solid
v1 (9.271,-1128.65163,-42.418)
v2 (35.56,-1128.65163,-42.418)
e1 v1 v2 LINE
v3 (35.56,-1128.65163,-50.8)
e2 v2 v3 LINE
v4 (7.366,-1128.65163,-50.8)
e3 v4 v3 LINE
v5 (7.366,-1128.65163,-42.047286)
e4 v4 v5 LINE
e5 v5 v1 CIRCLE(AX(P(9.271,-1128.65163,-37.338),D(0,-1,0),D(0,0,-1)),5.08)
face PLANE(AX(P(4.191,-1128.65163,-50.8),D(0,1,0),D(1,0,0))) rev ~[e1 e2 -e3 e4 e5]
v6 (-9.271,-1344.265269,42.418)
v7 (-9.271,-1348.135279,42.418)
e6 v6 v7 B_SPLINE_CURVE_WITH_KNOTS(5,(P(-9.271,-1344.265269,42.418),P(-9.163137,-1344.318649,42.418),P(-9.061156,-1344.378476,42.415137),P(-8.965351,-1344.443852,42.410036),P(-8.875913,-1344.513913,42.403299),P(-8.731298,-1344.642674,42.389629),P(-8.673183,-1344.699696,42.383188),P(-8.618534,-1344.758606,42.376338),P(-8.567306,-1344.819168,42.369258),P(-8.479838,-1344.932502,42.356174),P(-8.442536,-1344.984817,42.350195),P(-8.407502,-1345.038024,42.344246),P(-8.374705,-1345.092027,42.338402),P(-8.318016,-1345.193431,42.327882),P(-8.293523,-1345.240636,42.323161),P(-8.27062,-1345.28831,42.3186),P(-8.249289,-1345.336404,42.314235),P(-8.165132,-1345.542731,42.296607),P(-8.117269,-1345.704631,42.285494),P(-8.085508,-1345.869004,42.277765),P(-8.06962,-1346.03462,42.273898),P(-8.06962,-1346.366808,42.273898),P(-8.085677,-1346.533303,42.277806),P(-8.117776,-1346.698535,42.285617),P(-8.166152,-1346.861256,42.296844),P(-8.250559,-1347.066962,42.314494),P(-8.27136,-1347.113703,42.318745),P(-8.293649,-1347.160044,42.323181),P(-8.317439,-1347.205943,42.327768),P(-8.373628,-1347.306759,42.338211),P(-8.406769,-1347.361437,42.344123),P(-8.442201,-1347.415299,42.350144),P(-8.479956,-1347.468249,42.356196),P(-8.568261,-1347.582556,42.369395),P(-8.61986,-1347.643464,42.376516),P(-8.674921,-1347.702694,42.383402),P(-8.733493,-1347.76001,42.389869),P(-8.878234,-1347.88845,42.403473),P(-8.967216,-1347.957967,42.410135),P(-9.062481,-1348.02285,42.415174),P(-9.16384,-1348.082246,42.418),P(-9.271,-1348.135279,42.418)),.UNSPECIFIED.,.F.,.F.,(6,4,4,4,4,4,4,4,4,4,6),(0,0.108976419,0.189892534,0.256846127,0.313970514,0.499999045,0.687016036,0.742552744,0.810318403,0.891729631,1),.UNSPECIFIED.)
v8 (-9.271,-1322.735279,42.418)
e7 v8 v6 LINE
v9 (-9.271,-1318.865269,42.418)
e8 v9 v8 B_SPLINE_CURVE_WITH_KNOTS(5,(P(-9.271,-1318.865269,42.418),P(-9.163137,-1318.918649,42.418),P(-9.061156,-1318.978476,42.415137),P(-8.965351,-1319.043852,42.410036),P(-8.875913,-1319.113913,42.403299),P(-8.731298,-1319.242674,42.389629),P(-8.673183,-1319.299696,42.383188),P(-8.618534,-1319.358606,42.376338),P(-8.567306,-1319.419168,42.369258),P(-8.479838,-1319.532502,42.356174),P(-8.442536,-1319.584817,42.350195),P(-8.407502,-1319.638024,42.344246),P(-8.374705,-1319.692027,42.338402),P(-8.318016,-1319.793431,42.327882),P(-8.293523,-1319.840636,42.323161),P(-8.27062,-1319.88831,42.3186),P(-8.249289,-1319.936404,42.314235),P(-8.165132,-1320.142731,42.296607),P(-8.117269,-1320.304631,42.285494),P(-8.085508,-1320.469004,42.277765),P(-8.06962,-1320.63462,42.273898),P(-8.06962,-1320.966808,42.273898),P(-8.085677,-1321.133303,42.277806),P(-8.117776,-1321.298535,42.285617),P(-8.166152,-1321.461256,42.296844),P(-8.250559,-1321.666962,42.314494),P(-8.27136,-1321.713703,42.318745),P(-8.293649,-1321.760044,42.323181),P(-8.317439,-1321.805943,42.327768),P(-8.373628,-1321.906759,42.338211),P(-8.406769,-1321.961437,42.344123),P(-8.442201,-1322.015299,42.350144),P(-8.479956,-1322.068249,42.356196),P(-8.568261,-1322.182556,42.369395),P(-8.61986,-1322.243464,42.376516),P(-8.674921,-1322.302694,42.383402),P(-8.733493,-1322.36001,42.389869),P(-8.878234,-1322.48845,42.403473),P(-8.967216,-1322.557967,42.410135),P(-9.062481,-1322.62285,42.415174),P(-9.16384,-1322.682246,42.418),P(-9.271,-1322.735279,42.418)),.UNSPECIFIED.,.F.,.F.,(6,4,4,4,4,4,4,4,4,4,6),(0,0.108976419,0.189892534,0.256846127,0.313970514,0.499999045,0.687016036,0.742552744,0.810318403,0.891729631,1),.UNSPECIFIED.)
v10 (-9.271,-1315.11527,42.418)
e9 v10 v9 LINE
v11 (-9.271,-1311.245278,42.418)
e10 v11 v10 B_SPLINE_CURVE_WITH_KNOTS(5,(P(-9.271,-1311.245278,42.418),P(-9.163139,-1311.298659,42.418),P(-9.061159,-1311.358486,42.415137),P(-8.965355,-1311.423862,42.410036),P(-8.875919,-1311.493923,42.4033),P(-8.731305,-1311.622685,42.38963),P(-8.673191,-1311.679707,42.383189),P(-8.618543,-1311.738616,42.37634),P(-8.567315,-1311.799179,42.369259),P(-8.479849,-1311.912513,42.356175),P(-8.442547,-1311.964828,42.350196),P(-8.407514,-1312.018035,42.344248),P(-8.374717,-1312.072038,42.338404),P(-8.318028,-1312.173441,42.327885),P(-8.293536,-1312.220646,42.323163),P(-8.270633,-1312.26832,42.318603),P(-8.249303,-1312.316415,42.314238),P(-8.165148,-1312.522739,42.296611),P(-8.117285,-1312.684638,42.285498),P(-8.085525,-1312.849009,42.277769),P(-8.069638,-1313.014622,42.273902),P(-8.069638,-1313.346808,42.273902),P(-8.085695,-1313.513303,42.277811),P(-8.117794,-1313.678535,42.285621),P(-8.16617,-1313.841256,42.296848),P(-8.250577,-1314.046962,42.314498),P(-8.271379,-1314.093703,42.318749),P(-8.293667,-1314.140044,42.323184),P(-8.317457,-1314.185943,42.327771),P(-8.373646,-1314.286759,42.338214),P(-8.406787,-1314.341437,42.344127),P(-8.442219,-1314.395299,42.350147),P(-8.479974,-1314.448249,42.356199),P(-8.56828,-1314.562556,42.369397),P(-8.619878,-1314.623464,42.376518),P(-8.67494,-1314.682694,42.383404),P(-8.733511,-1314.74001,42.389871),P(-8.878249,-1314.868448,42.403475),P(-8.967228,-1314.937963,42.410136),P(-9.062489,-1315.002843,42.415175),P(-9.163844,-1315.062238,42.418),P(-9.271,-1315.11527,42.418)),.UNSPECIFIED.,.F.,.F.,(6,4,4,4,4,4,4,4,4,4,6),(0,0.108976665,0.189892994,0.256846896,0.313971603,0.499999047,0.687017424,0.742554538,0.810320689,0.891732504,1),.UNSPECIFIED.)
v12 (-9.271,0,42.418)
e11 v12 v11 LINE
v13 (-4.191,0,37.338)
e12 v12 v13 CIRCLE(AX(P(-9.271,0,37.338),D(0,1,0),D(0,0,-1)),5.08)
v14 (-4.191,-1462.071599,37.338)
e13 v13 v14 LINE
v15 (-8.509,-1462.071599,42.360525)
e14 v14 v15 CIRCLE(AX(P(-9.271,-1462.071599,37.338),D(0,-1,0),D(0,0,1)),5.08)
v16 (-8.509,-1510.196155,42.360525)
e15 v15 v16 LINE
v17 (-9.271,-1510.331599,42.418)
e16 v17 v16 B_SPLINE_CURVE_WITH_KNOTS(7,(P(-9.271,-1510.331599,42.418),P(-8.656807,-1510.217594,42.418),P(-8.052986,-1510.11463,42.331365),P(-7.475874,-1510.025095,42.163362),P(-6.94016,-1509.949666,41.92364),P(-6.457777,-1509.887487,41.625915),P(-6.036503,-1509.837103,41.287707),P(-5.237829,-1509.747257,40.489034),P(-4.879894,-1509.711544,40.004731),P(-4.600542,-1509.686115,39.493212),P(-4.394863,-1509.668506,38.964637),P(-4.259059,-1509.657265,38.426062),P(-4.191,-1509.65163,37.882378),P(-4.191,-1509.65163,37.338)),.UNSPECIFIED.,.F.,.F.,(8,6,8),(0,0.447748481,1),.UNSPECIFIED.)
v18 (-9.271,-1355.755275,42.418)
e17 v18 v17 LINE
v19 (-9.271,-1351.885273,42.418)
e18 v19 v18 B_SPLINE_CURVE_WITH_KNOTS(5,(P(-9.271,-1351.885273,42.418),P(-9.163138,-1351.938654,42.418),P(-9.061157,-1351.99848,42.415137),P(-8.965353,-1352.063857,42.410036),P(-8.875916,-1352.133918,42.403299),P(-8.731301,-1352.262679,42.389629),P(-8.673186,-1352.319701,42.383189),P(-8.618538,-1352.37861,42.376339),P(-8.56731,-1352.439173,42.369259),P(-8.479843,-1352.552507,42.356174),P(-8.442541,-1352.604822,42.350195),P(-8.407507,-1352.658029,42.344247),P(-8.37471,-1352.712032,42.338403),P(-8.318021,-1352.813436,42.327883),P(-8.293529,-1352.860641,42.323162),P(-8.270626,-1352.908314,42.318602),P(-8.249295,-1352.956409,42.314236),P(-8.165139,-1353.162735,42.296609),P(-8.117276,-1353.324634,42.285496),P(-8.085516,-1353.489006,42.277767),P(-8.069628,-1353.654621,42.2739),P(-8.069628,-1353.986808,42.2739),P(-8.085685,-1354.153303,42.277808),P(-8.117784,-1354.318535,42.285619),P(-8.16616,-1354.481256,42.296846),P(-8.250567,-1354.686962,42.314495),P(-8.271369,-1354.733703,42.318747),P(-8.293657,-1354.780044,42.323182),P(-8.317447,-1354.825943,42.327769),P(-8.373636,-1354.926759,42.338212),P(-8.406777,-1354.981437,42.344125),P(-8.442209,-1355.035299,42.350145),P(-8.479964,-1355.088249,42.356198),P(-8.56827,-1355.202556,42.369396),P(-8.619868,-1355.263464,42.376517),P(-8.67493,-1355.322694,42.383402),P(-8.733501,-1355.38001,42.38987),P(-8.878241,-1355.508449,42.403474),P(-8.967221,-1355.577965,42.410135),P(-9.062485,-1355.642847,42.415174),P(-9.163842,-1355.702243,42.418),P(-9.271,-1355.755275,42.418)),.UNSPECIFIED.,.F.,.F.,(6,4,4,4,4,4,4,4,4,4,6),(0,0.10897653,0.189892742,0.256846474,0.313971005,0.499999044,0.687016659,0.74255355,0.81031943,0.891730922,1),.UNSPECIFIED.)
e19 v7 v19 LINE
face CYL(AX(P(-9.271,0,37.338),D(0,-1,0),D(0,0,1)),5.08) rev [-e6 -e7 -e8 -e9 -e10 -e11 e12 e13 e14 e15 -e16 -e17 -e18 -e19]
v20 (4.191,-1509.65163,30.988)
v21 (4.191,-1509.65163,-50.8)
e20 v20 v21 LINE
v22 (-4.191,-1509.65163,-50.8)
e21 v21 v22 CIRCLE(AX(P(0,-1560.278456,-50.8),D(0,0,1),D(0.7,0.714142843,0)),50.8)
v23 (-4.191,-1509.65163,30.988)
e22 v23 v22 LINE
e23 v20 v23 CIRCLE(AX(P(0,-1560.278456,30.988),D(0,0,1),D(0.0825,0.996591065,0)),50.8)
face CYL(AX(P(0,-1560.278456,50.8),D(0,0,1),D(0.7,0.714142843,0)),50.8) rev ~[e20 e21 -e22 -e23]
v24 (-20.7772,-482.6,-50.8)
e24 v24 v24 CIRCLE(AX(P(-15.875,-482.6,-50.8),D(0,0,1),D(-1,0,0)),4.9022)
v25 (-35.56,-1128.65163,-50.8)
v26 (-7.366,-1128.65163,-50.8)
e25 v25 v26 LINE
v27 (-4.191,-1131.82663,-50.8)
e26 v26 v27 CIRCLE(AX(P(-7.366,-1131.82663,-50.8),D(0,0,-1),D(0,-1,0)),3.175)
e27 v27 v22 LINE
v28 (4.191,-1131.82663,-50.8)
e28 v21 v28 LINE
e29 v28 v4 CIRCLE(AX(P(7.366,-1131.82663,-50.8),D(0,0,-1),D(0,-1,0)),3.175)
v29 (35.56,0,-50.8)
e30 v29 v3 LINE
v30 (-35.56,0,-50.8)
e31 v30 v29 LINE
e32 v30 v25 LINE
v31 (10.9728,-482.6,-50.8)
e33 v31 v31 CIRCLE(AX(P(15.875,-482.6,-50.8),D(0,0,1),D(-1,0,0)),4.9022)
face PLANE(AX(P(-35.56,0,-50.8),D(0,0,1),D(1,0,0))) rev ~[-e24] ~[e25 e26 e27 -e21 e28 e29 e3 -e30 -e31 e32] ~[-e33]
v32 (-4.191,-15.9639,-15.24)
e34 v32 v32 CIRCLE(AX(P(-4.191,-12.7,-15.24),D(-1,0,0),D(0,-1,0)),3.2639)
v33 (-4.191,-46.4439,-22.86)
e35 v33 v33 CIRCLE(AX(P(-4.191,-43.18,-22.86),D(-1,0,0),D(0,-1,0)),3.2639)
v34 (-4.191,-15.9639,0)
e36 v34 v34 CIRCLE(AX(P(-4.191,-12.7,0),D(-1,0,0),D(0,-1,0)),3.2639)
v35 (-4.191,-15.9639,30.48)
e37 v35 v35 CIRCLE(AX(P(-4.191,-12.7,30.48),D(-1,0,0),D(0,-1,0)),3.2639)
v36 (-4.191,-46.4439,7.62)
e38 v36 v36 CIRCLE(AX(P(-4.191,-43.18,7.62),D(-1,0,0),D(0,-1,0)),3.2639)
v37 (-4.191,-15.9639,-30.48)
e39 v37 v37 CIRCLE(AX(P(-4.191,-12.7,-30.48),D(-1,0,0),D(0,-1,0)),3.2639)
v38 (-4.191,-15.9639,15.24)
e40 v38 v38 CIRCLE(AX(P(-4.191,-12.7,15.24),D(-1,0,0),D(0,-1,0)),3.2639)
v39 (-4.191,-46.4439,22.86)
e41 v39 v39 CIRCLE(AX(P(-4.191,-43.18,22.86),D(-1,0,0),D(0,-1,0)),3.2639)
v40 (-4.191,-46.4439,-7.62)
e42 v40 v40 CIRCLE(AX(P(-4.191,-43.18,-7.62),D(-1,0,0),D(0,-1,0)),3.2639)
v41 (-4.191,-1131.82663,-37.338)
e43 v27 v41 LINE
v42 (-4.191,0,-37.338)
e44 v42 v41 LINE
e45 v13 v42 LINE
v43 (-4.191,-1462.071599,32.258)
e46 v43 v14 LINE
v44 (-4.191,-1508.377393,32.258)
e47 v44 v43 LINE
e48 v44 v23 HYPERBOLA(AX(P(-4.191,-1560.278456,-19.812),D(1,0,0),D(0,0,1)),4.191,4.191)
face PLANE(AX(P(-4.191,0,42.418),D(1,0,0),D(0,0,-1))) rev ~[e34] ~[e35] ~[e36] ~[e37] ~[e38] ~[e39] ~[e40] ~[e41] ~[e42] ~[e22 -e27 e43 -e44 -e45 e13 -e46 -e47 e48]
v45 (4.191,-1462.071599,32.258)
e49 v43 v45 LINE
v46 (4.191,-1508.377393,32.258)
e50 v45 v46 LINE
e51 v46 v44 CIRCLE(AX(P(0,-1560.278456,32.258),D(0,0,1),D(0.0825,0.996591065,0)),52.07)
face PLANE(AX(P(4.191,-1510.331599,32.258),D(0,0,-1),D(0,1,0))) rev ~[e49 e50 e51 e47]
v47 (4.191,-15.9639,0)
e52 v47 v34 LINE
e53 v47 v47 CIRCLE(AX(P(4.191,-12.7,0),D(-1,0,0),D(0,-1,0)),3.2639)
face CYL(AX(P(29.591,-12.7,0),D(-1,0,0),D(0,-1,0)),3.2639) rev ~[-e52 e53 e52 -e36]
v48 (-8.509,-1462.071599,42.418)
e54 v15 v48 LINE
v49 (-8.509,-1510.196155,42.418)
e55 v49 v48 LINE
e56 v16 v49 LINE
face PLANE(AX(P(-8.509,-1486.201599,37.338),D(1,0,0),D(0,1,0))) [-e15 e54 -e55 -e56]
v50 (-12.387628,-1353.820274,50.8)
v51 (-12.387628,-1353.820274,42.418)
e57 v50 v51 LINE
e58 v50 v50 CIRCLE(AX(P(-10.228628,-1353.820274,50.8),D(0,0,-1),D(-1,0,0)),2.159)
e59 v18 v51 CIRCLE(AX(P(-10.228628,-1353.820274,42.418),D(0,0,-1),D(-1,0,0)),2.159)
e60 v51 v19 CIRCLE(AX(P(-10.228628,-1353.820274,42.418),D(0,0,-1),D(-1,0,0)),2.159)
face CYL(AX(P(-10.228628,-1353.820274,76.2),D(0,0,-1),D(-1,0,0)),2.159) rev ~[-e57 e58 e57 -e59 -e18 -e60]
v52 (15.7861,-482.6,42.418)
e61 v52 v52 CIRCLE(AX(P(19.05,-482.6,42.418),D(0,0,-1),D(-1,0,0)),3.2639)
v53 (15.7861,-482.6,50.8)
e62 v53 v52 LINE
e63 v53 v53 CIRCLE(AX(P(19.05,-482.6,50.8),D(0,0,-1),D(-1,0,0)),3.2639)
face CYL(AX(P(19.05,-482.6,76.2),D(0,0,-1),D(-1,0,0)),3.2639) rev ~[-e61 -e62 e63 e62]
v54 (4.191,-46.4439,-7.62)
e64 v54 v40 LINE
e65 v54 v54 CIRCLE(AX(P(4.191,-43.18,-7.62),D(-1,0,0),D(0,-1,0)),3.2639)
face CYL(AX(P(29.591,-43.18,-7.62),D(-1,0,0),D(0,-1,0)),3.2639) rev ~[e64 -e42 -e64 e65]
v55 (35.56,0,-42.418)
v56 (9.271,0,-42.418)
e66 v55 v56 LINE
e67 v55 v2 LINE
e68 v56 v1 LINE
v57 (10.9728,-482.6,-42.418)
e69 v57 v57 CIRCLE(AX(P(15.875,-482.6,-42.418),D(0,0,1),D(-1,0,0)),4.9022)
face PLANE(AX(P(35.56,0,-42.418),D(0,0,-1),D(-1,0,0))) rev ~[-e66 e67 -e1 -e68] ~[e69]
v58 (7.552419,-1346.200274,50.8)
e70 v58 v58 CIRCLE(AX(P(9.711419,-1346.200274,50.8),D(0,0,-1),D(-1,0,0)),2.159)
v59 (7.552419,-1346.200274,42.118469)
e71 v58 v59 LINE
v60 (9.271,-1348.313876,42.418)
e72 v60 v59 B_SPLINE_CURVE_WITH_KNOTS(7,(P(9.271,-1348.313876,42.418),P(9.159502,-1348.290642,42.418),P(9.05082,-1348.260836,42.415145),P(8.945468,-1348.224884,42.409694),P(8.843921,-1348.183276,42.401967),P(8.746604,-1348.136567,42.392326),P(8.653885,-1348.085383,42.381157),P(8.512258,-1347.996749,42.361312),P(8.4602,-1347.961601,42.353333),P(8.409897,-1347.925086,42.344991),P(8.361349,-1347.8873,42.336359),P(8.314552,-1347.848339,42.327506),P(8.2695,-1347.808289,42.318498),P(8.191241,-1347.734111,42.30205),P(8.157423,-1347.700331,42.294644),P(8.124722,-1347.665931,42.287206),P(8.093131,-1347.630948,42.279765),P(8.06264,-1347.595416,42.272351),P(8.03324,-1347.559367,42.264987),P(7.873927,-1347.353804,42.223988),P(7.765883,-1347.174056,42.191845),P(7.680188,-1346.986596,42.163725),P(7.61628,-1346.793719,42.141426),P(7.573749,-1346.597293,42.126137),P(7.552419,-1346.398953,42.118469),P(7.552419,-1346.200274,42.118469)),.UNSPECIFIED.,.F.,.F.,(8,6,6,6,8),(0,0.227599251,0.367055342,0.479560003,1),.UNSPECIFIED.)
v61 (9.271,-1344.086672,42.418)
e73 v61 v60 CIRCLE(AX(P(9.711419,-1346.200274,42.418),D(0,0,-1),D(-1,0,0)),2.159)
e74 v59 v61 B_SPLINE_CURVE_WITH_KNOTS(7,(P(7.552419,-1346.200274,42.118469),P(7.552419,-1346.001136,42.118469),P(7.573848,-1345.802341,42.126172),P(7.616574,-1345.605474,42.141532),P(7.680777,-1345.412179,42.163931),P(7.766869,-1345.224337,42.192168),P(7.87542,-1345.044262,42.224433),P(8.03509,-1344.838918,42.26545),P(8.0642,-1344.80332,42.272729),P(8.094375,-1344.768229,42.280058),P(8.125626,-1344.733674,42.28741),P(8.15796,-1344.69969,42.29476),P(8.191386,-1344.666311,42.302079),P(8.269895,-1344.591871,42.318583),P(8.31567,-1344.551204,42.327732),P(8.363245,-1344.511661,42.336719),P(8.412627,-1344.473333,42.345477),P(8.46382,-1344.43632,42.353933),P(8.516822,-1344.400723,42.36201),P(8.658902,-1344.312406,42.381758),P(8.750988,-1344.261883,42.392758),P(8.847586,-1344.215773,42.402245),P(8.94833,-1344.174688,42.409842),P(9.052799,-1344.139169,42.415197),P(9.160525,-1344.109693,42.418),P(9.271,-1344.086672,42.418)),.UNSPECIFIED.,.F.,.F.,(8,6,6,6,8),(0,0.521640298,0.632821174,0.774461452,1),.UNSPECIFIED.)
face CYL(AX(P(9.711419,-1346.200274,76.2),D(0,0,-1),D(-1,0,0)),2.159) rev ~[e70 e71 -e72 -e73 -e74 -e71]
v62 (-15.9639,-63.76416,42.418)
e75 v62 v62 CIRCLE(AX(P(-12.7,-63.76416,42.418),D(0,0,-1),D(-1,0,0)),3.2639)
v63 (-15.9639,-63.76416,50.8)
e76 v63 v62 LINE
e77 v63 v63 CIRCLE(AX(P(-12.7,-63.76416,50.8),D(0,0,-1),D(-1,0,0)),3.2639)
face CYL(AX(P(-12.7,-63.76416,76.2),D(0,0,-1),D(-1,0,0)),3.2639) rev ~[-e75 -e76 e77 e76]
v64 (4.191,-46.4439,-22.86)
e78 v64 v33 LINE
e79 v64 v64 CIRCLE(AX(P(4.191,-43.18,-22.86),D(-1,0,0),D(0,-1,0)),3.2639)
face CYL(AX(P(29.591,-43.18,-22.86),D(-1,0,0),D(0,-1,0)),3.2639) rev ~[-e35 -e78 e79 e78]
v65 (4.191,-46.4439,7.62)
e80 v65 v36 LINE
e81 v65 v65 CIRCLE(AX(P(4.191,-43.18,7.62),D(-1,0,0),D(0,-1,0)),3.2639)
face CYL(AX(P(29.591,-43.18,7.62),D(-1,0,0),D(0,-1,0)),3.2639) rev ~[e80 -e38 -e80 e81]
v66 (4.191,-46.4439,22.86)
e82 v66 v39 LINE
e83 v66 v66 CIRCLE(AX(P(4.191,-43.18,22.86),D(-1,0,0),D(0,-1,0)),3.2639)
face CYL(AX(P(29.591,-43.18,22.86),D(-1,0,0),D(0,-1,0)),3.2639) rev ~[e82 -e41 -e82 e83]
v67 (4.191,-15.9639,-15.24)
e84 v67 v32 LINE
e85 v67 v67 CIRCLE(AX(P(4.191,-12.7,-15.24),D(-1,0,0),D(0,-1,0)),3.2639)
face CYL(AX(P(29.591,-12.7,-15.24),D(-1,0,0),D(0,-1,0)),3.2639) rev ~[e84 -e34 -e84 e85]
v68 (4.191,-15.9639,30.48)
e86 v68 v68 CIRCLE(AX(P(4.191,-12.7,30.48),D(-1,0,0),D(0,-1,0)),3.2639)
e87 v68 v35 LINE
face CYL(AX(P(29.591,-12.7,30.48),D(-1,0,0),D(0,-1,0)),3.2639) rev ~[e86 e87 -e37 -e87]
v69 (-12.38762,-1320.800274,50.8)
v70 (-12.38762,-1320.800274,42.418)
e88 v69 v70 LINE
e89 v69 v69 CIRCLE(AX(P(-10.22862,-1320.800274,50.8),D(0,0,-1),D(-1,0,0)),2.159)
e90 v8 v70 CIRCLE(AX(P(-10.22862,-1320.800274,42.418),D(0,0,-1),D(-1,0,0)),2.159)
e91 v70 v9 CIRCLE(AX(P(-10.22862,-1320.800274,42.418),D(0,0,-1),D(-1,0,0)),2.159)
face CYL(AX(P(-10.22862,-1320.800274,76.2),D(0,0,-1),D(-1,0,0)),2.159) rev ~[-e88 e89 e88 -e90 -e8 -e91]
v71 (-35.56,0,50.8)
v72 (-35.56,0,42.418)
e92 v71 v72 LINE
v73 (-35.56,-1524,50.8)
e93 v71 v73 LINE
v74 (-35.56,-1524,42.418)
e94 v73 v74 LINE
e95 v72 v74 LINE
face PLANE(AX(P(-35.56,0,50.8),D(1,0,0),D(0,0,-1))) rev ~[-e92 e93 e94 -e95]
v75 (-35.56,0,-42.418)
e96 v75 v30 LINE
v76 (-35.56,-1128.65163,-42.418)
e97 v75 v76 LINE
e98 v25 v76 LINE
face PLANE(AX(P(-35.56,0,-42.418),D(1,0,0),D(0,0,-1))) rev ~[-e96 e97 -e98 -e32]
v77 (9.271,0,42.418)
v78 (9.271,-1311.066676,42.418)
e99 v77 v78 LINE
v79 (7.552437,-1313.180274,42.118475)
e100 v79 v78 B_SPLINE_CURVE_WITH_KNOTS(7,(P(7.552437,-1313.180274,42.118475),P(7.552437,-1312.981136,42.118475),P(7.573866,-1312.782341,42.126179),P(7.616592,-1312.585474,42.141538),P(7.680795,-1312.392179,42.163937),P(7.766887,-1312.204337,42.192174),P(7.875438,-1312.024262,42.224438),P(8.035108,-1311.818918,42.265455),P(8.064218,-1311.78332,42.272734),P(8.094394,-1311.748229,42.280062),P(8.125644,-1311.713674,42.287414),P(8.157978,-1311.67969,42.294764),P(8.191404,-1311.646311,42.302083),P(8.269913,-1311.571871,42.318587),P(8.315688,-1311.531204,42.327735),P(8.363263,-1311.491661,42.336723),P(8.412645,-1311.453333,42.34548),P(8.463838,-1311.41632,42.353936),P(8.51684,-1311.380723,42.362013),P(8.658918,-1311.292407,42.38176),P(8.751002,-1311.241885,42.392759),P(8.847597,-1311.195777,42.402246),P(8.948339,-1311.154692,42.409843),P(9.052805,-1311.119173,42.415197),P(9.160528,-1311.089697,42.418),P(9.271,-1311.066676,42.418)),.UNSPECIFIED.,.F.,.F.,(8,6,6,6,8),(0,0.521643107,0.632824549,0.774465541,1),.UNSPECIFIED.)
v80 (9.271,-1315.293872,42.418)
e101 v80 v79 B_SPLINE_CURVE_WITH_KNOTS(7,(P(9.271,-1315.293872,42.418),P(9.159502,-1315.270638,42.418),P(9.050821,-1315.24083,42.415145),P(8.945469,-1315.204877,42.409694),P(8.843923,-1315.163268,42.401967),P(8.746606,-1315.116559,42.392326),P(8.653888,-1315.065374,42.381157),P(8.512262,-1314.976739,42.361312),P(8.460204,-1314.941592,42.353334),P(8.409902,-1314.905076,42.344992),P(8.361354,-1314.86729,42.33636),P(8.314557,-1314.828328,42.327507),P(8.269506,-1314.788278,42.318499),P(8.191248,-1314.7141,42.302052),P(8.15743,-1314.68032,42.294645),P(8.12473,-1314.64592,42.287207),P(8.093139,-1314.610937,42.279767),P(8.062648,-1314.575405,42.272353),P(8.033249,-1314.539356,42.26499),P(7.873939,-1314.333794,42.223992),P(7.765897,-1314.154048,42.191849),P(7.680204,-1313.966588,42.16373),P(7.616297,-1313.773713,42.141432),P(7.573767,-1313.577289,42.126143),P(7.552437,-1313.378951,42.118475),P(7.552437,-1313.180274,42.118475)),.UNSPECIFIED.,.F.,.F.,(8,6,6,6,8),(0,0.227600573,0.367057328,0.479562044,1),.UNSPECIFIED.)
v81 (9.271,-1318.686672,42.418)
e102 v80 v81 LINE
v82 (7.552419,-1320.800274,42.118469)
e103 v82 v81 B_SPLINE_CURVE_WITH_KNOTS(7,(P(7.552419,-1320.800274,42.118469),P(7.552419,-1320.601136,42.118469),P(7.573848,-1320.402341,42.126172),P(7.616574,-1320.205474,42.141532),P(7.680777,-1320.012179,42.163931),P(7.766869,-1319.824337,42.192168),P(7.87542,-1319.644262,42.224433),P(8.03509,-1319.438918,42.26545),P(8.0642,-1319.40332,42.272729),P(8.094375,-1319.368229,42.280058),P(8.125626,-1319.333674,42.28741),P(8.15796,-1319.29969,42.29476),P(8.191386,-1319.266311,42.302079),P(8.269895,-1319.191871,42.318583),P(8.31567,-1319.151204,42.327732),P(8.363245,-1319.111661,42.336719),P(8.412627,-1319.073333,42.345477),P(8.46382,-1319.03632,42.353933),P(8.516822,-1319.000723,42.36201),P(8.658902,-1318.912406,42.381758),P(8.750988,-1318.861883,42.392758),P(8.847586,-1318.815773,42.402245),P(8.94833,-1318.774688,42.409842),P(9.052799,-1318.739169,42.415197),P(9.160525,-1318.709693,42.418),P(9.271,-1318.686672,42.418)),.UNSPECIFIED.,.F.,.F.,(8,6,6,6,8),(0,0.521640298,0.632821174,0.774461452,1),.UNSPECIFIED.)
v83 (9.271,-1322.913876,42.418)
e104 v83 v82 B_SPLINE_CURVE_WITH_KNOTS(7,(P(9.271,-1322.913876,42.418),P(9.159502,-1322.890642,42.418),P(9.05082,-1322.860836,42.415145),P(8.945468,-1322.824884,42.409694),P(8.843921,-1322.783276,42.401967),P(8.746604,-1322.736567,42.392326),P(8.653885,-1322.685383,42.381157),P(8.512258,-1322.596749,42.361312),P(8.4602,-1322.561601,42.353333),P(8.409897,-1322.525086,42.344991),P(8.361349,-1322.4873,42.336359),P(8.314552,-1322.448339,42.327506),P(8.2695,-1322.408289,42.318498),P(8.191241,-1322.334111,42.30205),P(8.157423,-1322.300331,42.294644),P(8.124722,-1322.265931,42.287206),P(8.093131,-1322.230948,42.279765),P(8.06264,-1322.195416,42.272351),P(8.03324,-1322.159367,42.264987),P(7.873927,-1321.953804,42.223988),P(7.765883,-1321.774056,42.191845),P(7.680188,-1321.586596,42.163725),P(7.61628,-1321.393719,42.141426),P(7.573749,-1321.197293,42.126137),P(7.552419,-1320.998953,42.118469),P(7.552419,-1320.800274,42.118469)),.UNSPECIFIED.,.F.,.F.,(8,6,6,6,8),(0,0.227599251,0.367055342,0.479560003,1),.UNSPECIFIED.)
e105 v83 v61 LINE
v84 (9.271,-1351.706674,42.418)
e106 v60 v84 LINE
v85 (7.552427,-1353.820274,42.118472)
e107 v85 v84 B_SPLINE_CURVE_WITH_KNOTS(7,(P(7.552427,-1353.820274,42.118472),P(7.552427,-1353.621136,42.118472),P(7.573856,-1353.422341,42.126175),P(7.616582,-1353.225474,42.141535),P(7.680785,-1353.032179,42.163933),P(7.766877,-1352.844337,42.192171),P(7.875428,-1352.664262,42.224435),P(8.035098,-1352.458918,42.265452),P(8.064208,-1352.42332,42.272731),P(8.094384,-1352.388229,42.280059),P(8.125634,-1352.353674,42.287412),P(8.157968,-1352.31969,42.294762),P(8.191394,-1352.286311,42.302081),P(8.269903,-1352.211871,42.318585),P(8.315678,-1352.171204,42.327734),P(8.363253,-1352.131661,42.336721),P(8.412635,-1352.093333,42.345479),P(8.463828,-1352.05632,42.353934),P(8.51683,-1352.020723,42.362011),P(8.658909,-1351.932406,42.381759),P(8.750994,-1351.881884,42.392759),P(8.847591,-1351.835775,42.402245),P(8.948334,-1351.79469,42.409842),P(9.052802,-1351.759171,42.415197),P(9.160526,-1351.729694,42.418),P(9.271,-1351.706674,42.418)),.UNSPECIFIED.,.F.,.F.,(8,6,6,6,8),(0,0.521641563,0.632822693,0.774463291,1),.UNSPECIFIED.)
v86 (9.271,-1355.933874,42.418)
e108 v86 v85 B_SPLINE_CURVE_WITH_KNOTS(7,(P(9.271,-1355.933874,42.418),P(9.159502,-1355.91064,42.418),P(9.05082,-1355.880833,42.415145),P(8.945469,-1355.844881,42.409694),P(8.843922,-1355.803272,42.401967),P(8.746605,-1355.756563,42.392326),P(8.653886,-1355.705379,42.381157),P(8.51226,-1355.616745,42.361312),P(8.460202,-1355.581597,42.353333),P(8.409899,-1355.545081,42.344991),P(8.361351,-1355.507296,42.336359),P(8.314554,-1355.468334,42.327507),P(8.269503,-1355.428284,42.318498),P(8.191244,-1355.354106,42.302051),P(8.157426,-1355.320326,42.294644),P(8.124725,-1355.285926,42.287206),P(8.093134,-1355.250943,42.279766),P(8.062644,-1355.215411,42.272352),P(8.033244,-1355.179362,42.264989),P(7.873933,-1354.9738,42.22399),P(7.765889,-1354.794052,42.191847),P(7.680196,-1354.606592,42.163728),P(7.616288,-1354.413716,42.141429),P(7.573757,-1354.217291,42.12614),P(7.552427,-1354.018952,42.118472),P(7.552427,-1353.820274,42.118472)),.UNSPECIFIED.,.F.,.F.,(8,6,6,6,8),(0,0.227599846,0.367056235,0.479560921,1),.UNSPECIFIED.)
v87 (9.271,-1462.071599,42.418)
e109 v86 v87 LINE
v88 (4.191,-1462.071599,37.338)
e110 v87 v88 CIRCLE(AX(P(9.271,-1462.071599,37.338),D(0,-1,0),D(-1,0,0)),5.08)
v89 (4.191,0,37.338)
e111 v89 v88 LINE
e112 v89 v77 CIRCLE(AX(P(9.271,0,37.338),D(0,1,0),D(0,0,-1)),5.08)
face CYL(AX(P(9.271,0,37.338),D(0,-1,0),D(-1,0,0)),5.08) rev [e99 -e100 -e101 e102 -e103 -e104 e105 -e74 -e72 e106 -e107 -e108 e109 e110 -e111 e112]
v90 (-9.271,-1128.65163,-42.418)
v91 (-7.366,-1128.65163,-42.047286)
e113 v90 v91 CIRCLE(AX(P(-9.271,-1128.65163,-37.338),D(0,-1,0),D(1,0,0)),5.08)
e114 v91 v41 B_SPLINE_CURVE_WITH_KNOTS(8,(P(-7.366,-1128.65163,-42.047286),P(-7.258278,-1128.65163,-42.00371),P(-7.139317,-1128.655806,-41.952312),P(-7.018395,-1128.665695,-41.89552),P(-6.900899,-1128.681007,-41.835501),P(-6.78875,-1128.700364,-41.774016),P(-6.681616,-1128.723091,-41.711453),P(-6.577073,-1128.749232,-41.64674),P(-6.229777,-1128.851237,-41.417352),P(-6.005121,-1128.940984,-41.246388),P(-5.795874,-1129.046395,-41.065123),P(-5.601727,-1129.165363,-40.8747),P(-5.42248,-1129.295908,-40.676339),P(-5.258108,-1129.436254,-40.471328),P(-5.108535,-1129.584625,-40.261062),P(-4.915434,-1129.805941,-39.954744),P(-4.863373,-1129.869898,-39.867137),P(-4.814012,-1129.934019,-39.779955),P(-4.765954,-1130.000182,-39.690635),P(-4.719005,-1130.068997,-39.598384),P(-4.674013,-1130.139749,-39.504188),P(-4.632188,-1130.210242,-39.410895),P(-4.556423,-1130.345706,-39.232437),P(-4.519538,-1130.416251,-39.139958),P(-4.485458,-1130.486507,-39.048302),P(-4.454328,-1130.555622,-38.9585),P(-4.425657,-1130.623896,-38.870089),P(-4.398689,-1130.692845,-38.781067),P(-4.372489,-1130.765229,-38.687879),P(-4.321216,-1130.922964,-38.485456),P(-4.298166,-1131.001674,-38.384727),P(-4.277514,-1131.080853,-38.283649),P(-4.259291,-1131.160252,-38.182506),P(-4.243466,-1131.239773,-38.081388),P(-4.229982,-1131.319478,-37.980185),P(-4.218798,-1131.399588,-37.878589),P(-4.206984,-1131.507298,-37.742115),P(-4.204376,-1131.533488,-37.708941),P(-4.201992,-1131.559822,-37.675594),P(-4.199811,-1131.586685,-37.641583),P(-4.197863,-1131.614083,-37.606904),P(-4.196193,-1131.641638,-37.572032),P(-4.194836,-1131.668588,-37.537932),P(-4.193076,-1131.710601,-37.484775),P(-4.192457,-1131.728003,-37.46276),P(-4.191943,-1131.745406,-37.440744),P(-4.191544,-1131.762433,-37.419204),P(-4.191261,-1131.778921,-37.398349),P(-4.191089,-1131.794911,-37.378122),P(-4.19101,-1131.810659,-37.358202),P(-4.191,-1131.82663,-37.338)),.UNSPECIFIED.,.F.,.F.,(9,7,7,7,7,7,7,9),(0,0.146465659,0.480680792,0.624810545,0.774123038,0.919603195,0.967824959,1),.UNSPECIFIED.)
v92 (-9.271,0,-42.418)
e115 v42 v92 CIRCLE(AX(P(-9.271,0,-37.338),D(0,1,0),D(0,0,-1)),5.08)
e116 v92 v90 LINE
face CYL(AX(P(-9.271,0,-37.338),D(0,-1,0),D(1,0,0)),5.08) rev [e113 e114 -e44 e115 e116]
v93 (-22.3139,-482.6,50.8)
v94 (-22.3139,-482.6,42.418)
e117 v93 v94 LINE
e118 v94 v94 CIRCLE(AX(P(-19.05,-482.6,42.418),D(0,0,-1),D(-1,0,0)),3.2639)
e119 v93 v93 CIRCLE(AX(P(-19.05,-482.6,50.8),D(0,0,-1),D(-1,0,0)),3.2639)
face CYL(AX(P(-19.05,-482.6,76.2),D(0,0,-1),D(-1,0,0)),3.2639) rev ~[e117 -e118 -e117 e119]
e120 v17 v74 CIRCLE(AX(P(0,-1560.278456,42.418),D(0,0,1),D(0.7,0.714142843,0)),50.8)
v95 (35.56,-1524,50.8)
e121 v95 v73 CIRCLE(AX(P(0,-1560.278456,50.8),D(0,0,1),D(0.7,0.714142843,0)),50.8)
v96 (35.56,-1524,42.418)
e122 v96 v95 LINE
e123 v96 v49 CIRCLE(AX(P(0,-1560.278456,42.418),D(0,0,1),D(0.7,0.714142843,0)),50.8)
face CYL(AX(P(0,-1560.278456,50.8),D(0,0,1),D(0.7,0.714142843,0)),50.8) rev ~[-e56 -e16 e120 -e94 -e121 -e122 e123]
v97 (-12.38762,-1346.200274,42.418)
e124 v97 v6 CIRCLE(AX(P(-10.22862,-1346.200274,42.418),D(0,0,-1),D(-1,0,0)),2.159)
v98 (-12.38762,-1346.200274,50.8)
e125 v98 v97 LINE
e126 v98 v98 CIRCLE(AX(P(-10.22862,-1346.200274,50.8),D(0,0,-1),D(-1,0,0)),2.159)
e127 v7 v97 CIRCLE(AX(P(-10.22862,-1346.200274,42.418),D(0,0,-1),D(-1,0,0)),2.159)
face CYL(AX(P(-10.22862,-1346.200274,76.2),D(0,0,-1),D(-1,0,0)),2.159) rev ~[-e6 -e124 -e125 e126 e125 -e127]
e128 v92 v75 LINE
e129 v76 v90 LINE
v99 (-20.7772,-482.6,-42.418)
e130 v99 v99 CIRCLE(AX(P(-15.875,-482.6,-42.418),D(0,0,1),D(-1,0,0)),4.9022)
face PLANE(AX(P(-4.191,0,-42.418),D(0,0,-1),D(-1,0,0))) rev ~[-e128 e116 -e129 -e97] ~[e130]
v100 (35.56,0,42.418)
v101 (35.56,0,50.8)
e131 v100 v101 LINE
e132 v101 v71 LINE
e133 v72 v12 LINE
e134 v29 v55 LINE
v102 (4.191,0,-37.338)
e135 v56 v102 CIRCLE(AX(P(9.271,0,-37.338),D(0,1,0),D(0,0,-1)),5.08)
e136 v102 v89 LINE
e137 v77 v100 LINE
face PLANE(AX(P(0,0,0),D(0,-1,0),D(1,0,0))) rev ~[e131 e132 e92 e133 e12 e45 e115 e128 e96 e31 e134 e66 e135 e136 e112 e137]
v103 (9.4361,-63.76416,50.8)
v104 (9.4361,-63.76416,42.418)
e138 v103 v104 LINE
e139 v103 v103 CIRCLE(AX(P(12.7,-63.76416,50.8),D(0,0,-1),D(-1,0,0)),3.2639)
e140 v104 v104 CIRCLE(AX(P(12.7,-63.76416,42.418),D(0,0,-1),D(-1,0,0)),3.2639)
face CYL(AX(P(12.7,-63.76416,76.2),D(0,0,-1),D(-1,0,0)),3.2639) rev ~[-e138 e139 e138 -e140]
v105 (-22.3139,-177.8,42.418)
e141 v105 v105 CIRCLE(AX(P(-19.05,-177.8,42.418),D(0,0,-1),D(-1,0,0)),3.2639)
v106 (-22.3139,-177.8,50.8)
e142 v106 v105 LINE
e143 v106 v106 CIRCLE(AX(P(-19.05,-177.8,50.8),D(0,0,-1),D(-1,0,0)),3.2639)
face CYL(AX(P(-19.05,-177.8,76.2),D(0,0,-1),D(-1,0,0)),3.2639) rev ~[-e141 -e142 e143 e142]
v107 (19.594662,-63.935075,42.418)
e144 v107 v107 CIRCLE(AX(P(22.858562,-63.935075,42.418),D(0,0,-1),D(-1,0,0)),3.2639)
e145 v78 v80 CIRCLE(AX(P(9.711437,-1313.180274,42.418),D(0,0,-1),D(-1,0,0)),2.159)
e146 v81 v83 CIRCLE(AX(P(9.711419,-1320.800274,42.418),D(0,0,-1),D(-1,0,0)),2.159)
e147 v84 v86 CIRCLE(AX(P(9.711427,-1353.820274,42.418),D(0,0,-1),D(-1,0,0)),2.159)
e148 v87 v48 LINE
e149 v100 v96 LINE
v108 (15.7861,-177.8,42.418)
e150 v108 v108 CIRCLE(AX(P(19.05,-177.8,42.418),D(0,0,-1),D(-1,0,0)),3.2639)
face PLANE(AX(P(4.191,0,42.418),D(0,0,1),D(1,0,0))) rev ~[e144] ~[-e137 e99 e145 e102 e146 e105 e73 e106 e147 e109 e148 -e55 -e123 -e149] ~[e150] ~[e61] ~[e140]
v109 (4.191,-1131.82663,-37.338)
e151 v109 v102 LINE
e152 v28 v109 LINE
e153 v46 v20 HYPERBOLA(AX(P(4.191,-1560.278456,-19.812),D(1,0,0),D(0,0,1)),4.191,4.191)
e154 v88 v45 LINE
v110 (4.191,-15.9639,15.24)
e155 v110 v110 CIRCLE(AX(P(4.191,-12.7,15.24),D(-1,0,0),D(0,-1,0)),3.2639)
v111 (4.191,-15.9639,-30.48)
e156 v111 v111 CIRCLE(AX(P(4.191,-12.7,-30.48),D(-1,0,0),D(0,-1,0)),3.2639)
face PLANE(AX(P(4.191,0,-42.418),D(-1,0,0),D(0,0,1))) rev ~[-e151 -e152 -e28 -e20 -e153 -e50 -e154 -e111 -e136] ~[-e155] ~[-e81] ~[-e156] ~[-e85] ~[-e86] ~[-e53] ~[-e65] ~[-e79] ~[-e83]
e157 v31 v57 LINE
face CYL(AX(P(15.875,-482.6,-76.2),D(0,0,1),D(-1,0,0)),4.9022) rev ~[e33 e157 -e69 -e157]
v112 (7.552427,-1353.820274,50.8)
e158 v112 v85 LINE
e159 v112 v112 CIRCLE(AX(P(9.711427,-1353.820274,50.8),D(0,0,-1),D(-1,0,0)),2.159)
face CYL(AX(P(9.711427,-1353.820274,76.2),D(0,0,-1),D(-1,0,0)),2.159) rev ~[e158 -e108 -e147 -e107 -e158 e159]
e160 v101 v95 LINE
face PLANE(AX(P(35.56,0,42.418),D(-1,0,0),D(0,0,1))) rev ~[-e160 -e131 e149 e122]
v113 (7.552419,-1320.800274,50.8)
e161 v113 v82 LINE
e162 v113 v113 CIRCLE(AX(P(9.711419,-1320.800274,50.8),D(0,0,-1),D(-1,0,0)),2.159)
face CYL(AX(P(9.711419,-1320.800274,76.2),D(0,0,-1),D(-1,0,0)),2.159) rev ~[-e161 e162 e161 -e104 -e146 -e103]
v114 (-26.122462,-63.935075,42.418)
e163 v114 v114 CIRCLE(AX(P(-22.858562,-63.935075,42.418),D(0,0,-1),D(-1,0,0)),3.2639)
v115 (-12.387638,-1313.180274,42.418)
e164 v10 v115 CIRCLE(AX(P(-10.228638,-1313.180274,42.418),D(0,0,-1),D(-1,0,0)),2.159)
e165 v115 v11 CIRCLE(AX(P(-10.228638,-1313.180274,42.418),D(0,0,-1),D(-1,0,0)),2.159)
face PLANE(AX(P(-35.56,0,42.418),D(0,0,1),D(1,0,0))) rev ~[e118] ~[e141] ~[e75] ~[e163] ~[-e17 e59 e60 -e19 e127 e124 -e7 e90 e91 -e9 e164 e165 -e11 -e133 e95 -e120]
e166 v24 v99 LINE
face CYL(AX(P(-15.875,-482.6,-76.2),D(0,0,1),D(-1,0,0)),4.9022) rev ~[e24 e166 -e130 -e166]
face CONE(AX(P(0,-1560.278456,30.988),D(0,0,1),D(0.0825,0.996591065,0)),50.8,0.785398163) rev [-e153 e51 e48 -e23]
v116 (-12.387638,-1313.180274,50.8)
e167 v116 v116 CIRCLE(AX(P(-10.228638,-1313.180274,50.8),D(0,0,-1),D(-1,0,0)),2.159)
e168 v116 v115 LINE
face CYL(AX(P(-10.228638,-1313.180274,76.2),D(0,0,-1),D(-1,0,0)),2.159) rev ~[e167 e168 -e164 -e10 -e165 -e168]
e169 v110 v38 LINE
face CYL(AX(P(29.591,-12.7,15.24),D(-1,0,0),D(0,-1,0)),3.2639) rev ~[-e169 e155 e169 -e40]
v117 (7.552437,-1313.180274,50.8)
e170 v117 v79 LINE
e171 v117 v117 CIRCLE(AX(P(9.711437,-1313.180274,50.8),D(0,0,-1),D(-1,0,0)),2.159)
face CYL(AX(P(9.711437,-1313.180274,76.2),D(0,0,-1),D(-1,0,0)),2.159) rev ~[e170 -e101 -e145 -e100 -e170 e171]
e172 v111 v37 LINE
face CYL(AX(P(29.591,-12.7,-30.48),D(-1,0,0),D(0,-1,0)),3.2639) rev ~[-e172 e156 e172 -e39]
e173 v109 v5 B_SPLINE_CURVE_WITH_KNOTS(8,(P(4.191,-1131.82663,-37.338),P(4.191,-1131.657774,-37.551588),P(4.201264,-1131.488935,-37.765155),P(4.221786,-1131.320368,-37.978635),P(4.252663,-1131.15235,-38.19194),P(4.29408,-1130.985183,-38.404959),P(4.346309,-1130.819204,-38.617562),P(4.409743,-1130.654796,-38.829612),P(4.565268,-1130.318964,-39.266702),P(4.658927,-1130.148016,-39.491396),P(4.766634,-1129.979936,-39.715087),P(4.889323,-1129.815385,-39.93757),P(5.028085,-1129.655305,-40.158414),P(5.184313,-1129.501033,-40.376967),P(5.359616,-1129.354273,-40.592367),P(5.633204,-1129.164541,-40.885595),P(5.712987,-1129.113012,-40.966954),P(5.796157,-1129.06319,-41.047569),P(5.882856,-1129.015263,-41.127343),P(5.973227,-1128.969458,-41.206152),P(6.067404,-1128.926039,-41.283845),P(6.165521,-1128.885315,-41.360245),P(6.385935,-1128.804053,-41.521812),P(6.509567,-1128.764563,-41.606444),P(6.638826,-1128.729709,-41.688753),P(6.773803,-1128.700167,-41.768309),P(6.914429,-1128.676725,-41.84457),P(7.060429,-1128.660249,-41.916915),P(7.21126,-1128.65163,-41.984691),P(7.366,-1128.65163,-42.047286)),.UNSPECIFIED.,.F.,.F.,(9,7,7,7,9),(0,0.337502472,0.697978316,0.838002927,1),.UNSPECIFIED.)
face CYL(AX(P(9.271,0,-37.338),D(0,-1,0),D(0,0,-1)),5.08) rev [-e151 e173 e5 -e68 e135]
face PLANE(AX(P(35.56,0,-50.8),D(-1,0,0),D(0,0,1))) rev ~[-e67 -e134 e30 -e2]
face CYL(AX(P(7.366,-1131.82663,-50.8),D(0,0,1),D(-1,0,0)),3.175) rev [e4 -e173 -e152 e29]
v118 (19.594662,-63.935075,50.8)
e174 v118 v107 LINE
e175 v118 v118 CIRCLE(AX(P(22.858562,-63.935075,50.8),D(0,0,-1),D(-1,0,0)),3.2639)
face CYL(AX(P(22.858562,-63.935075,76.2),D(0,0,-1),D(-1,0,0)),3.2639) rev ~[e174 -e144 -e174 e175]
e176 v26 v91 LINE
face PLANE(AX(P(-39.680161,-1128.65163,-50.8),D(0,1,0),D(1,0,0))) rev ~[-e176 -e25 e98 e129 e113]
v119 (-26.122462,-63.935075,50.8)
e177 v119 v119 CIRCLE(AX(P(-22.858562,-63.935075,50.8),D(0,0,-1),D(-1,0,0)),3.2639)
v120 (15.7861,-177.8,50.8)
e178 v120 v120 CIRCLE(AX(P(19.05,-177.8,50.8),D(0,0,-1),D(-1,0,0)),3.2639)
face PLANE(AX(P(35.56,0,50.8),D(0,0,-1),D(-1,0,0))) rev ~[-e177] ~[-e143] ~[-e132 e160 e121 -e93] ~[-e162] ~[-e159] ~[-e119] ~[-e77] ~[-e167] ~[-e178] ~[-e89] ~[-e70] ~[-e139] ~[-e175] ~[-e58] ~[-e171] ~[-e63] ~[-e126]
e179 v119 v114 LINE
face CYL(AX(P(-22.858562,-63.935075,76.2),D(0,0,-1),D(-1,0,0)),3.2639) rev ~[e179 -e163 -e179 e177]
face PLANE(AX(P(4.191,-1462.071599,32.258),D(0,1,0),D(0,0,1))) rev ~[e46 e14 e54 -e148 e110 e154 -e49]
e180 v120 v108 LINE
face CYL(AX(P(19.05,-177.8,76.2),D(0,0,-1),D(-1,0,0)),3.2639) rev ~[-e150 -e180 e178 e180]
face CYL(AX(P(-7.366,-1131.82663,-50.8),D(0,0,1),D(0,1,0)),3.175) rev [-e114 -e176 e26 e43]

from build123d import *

# Parameters (mm, degrees)
F1_DEPTH  = 1524
F2_R      = 5.08
F4_DEPTH  = 101.6
F6_W      = 48.26
F6_H      = 10.16
F7_DEPTH  = 12.7
F8_SIZE   = 1.27
F10_D     = 4.318
F10_DEPTH = 25.4
F10_TIP   = 1.2972580765
F11_W     = 35.4891605821
F11_H     = 399.7617846188
F12_DEPTH = 25.4
F13_R     = 3.175
F15_D     = 6.5278
F15_DEPTH = 25.4
F15_TIP   = 1.9611489744
F17_D     = 6.5278
F17_DEPTH = 25.4
F17_TIP   = 1.9611489744
F19_D     = 6.5278
F19_DEPTH = 25.4
F19_TIP   = 1.9611489744
F21_D     = 9.8044
F21_DEPTH = 25.4
F21_TIP   = 2.9455389266


with BuildPart() as f1:
    # F0 (on Front) → F1 (new body)
    with BuildSketch(Plane.XZ):
        Polygon((-35.56, -50.8), (35.56, -50.8), (35.56, -42.418), (4.191, -42.418), (4.191, 0), (4.191, 42.418), (35.56, 42.418), (35.56, 50.8), (0, 50.8), (-4.191, 50.8), (-35.56, 50.8), (-35.56, 42.418), (-4.191, 42.418), (-4.191, 0), (-4.191, -42.418), (-35.56, -42.418), align=None)
    extrude(amount=F1_DEPTH)

    # F2
    f2_edges = [f1.edges().sort_by_distance(p)[0] for p in [
        (4.191, -762, 42.418),
        (4.191, -762, -42.418),
        (-4.191, -762, -42.418),
        (-4.191, -762, 42.418),
    ]]
    fillet(f2_edges, radius=F2_R)

    # F3 (on face) → F4 (cut)
    with BuildSketch(Plane.XY.offset(50.8)):
        Polygon((35.56, -1524), (0, -1524), (0, -1560.278456417), align=None)
        with BuildLine():
            Line((0, -1560.278456417), (0, -1524))
            Line((0, -1524), (-35.56, -1524))
            ThreePointArc((-35.56, -1524), (-47.0297011791, -1579.4838516748), (0, -1611.078456417))
            ThreePointArc((0, -1611.078456417), (35.9210244843, -1596.1994809013), (50.8, -1560.278456417))
            ThreePointArc((50.8, -1560.278456417), (46.835285843, -1540.6037010183), (35.56, -1524))
            Line((35.56, -1524), (0, -1560.278456417))
        make_face()
        with BuildLine():
            Line((-35.56, -1524), (0, -1524))
            Line((0, -1524), (35.56, -1524))
            ThreePointArc((35.56, -1524), (0, -1509.478456417), (-35.56, -1524))
        make_face()
    extrude(amount=-F4_DEPTH, mode=Mode.SUBTRACT)

    # F6 (on face) → F7 (cut, symmetric)
    with BuildSketch(Plane.YZ.offset(4.191)):
        with Locations((-1486.2015990684, 37.338)):
            Rectangle(F6_W, F6_H)
    extrude(amount=F7_DEPTH, both=True, mode=Mode.SUBTRACT)

    # F8
    f8_edges = [f1.edges().sort_by_distance(p)[0] for p in [
        (0, -1509.478456, 32.258),
    ]]
    chamfer(f8_edges, length=F8_SIZE)

    # F10
    with Locations(Plane.XY.offset(50.8)):
        with Locations((-10.2286281229, -1353.8202740377), (-10.2286199642, -1346.2002740377), (-10.2286199642, -1320.8002740377), (-10.2286381092, -1313.1802740377), (9.711437429, -1313.1802740377), (9.711419284, -1320.8002740377), (9.711419284, -1346.2002740377), (9.7114274426, -1353.8202740377)):
            Hole(F10_D / 2, depth=F10_DEPTH)
            with Locations((0, 0, -(F10_DEPTH + F10_TIP / 2))):  # 118° drill point
                Cone(0, F10_D / 2, F10_TIP, mode=Mode.SUBTRACT)

    # F11 (on face) → F12 (cut)
    with BuildSketch(Plane(origin=(0, 0, -50.8), x_dir=(1, 0, 0), z_dir=(0, 0, -1))):
        Polygon((4.191, 1528.4134149551), (4.191, 1509.6516303364), (4.191, 1128.6516303364), (39.6801605821, 1128.6516303364), (39.6801605821, 1528.4134149551), align=None)
        with Locations((-21.935580291, 1328.5325226457)):
            Rectangle(F11_W, F11_H)
    extrude(amount=-F12_DEPTH, mode=Mode.SUBTRACT)

    # F13
    f13_edges = [f1.edges().sort_by_distance(p)[0] for p in [
        (4.191, -1128.65163, -44.069),
        (-4.191, -1128.65163, -44.069),
    ]]
    fillet(f13_edges, radius=F13_R)

    # F15
    with Locations(Plane.YZ.offset(4.191)):
        with Locations((-43.18, 22.86), (-43.18, 7.62), (-12.7, 30.48), (-12.7, 15.24), (-12.7, 0), (-12.7, -15.24), (-12.7, -30.48), (-43.18, -7.62), (-43.18, -22.86)):
            Hole(F15_D / 2, depth=F15_DEPTH)
            with Locations((0, 0, -(F15_DEPTH + F15_TIP / 2))):  # 118° drill point
                Cone(0, F15_D / 2, F15_TIP, mode=Mode.SUBTRACT)

    # F17
    with Locations(Plane.XY.offset(50.8)):
        with Locations((-22.858562297, -63.9350753549), (-12.7, -63.76416), (12.7, -63.76416), (22.858562297, -63.9350753549)):
            Hole(F17_D / 2, depth=F17_DEPTH)
            with Locations((0, 0, -(F17_DEPTH + F17_TIP / 2))):  # 118° drill point
                Cone(0, F17_D / 2, F17_TIP, mode=Mode.SUBTRACT)

    # F19
    with Locations(Plane.XY.offset(50.8)):
        with Locations((19.05, -177.8), (-19.05, -177.8), (-19.05, -482.6), (19.05, -482.6)):
            Hole(F19_D / 2, depth=F19_DEPTH)
            with Locations((0, 0, -(F19_DEPTH + F19_TIP / 2))):  # 118° drill point
                Cone(0, F19_D / 2, F19_TIP, mode=Mode.SUBTRACT)

    # F21
    with Locations(Plane(origin=(0, 0, -50.8), x_dir=(1, 0, 0), z_dir=(0, 0, -1))):
        with Locations((15.875, 482.6), (-15.875, 482.6)):
            Hole(F21_D / 2, depth=F21_DEPTH)
            with Locations((0, 0, -(F21_DEPTH + F21_TIP / 2))):  # 118° drill point
                Cone(0, F21_D / 2, F21_TIP, mode=Mode.SUBTRACT)


solid = f1.part
